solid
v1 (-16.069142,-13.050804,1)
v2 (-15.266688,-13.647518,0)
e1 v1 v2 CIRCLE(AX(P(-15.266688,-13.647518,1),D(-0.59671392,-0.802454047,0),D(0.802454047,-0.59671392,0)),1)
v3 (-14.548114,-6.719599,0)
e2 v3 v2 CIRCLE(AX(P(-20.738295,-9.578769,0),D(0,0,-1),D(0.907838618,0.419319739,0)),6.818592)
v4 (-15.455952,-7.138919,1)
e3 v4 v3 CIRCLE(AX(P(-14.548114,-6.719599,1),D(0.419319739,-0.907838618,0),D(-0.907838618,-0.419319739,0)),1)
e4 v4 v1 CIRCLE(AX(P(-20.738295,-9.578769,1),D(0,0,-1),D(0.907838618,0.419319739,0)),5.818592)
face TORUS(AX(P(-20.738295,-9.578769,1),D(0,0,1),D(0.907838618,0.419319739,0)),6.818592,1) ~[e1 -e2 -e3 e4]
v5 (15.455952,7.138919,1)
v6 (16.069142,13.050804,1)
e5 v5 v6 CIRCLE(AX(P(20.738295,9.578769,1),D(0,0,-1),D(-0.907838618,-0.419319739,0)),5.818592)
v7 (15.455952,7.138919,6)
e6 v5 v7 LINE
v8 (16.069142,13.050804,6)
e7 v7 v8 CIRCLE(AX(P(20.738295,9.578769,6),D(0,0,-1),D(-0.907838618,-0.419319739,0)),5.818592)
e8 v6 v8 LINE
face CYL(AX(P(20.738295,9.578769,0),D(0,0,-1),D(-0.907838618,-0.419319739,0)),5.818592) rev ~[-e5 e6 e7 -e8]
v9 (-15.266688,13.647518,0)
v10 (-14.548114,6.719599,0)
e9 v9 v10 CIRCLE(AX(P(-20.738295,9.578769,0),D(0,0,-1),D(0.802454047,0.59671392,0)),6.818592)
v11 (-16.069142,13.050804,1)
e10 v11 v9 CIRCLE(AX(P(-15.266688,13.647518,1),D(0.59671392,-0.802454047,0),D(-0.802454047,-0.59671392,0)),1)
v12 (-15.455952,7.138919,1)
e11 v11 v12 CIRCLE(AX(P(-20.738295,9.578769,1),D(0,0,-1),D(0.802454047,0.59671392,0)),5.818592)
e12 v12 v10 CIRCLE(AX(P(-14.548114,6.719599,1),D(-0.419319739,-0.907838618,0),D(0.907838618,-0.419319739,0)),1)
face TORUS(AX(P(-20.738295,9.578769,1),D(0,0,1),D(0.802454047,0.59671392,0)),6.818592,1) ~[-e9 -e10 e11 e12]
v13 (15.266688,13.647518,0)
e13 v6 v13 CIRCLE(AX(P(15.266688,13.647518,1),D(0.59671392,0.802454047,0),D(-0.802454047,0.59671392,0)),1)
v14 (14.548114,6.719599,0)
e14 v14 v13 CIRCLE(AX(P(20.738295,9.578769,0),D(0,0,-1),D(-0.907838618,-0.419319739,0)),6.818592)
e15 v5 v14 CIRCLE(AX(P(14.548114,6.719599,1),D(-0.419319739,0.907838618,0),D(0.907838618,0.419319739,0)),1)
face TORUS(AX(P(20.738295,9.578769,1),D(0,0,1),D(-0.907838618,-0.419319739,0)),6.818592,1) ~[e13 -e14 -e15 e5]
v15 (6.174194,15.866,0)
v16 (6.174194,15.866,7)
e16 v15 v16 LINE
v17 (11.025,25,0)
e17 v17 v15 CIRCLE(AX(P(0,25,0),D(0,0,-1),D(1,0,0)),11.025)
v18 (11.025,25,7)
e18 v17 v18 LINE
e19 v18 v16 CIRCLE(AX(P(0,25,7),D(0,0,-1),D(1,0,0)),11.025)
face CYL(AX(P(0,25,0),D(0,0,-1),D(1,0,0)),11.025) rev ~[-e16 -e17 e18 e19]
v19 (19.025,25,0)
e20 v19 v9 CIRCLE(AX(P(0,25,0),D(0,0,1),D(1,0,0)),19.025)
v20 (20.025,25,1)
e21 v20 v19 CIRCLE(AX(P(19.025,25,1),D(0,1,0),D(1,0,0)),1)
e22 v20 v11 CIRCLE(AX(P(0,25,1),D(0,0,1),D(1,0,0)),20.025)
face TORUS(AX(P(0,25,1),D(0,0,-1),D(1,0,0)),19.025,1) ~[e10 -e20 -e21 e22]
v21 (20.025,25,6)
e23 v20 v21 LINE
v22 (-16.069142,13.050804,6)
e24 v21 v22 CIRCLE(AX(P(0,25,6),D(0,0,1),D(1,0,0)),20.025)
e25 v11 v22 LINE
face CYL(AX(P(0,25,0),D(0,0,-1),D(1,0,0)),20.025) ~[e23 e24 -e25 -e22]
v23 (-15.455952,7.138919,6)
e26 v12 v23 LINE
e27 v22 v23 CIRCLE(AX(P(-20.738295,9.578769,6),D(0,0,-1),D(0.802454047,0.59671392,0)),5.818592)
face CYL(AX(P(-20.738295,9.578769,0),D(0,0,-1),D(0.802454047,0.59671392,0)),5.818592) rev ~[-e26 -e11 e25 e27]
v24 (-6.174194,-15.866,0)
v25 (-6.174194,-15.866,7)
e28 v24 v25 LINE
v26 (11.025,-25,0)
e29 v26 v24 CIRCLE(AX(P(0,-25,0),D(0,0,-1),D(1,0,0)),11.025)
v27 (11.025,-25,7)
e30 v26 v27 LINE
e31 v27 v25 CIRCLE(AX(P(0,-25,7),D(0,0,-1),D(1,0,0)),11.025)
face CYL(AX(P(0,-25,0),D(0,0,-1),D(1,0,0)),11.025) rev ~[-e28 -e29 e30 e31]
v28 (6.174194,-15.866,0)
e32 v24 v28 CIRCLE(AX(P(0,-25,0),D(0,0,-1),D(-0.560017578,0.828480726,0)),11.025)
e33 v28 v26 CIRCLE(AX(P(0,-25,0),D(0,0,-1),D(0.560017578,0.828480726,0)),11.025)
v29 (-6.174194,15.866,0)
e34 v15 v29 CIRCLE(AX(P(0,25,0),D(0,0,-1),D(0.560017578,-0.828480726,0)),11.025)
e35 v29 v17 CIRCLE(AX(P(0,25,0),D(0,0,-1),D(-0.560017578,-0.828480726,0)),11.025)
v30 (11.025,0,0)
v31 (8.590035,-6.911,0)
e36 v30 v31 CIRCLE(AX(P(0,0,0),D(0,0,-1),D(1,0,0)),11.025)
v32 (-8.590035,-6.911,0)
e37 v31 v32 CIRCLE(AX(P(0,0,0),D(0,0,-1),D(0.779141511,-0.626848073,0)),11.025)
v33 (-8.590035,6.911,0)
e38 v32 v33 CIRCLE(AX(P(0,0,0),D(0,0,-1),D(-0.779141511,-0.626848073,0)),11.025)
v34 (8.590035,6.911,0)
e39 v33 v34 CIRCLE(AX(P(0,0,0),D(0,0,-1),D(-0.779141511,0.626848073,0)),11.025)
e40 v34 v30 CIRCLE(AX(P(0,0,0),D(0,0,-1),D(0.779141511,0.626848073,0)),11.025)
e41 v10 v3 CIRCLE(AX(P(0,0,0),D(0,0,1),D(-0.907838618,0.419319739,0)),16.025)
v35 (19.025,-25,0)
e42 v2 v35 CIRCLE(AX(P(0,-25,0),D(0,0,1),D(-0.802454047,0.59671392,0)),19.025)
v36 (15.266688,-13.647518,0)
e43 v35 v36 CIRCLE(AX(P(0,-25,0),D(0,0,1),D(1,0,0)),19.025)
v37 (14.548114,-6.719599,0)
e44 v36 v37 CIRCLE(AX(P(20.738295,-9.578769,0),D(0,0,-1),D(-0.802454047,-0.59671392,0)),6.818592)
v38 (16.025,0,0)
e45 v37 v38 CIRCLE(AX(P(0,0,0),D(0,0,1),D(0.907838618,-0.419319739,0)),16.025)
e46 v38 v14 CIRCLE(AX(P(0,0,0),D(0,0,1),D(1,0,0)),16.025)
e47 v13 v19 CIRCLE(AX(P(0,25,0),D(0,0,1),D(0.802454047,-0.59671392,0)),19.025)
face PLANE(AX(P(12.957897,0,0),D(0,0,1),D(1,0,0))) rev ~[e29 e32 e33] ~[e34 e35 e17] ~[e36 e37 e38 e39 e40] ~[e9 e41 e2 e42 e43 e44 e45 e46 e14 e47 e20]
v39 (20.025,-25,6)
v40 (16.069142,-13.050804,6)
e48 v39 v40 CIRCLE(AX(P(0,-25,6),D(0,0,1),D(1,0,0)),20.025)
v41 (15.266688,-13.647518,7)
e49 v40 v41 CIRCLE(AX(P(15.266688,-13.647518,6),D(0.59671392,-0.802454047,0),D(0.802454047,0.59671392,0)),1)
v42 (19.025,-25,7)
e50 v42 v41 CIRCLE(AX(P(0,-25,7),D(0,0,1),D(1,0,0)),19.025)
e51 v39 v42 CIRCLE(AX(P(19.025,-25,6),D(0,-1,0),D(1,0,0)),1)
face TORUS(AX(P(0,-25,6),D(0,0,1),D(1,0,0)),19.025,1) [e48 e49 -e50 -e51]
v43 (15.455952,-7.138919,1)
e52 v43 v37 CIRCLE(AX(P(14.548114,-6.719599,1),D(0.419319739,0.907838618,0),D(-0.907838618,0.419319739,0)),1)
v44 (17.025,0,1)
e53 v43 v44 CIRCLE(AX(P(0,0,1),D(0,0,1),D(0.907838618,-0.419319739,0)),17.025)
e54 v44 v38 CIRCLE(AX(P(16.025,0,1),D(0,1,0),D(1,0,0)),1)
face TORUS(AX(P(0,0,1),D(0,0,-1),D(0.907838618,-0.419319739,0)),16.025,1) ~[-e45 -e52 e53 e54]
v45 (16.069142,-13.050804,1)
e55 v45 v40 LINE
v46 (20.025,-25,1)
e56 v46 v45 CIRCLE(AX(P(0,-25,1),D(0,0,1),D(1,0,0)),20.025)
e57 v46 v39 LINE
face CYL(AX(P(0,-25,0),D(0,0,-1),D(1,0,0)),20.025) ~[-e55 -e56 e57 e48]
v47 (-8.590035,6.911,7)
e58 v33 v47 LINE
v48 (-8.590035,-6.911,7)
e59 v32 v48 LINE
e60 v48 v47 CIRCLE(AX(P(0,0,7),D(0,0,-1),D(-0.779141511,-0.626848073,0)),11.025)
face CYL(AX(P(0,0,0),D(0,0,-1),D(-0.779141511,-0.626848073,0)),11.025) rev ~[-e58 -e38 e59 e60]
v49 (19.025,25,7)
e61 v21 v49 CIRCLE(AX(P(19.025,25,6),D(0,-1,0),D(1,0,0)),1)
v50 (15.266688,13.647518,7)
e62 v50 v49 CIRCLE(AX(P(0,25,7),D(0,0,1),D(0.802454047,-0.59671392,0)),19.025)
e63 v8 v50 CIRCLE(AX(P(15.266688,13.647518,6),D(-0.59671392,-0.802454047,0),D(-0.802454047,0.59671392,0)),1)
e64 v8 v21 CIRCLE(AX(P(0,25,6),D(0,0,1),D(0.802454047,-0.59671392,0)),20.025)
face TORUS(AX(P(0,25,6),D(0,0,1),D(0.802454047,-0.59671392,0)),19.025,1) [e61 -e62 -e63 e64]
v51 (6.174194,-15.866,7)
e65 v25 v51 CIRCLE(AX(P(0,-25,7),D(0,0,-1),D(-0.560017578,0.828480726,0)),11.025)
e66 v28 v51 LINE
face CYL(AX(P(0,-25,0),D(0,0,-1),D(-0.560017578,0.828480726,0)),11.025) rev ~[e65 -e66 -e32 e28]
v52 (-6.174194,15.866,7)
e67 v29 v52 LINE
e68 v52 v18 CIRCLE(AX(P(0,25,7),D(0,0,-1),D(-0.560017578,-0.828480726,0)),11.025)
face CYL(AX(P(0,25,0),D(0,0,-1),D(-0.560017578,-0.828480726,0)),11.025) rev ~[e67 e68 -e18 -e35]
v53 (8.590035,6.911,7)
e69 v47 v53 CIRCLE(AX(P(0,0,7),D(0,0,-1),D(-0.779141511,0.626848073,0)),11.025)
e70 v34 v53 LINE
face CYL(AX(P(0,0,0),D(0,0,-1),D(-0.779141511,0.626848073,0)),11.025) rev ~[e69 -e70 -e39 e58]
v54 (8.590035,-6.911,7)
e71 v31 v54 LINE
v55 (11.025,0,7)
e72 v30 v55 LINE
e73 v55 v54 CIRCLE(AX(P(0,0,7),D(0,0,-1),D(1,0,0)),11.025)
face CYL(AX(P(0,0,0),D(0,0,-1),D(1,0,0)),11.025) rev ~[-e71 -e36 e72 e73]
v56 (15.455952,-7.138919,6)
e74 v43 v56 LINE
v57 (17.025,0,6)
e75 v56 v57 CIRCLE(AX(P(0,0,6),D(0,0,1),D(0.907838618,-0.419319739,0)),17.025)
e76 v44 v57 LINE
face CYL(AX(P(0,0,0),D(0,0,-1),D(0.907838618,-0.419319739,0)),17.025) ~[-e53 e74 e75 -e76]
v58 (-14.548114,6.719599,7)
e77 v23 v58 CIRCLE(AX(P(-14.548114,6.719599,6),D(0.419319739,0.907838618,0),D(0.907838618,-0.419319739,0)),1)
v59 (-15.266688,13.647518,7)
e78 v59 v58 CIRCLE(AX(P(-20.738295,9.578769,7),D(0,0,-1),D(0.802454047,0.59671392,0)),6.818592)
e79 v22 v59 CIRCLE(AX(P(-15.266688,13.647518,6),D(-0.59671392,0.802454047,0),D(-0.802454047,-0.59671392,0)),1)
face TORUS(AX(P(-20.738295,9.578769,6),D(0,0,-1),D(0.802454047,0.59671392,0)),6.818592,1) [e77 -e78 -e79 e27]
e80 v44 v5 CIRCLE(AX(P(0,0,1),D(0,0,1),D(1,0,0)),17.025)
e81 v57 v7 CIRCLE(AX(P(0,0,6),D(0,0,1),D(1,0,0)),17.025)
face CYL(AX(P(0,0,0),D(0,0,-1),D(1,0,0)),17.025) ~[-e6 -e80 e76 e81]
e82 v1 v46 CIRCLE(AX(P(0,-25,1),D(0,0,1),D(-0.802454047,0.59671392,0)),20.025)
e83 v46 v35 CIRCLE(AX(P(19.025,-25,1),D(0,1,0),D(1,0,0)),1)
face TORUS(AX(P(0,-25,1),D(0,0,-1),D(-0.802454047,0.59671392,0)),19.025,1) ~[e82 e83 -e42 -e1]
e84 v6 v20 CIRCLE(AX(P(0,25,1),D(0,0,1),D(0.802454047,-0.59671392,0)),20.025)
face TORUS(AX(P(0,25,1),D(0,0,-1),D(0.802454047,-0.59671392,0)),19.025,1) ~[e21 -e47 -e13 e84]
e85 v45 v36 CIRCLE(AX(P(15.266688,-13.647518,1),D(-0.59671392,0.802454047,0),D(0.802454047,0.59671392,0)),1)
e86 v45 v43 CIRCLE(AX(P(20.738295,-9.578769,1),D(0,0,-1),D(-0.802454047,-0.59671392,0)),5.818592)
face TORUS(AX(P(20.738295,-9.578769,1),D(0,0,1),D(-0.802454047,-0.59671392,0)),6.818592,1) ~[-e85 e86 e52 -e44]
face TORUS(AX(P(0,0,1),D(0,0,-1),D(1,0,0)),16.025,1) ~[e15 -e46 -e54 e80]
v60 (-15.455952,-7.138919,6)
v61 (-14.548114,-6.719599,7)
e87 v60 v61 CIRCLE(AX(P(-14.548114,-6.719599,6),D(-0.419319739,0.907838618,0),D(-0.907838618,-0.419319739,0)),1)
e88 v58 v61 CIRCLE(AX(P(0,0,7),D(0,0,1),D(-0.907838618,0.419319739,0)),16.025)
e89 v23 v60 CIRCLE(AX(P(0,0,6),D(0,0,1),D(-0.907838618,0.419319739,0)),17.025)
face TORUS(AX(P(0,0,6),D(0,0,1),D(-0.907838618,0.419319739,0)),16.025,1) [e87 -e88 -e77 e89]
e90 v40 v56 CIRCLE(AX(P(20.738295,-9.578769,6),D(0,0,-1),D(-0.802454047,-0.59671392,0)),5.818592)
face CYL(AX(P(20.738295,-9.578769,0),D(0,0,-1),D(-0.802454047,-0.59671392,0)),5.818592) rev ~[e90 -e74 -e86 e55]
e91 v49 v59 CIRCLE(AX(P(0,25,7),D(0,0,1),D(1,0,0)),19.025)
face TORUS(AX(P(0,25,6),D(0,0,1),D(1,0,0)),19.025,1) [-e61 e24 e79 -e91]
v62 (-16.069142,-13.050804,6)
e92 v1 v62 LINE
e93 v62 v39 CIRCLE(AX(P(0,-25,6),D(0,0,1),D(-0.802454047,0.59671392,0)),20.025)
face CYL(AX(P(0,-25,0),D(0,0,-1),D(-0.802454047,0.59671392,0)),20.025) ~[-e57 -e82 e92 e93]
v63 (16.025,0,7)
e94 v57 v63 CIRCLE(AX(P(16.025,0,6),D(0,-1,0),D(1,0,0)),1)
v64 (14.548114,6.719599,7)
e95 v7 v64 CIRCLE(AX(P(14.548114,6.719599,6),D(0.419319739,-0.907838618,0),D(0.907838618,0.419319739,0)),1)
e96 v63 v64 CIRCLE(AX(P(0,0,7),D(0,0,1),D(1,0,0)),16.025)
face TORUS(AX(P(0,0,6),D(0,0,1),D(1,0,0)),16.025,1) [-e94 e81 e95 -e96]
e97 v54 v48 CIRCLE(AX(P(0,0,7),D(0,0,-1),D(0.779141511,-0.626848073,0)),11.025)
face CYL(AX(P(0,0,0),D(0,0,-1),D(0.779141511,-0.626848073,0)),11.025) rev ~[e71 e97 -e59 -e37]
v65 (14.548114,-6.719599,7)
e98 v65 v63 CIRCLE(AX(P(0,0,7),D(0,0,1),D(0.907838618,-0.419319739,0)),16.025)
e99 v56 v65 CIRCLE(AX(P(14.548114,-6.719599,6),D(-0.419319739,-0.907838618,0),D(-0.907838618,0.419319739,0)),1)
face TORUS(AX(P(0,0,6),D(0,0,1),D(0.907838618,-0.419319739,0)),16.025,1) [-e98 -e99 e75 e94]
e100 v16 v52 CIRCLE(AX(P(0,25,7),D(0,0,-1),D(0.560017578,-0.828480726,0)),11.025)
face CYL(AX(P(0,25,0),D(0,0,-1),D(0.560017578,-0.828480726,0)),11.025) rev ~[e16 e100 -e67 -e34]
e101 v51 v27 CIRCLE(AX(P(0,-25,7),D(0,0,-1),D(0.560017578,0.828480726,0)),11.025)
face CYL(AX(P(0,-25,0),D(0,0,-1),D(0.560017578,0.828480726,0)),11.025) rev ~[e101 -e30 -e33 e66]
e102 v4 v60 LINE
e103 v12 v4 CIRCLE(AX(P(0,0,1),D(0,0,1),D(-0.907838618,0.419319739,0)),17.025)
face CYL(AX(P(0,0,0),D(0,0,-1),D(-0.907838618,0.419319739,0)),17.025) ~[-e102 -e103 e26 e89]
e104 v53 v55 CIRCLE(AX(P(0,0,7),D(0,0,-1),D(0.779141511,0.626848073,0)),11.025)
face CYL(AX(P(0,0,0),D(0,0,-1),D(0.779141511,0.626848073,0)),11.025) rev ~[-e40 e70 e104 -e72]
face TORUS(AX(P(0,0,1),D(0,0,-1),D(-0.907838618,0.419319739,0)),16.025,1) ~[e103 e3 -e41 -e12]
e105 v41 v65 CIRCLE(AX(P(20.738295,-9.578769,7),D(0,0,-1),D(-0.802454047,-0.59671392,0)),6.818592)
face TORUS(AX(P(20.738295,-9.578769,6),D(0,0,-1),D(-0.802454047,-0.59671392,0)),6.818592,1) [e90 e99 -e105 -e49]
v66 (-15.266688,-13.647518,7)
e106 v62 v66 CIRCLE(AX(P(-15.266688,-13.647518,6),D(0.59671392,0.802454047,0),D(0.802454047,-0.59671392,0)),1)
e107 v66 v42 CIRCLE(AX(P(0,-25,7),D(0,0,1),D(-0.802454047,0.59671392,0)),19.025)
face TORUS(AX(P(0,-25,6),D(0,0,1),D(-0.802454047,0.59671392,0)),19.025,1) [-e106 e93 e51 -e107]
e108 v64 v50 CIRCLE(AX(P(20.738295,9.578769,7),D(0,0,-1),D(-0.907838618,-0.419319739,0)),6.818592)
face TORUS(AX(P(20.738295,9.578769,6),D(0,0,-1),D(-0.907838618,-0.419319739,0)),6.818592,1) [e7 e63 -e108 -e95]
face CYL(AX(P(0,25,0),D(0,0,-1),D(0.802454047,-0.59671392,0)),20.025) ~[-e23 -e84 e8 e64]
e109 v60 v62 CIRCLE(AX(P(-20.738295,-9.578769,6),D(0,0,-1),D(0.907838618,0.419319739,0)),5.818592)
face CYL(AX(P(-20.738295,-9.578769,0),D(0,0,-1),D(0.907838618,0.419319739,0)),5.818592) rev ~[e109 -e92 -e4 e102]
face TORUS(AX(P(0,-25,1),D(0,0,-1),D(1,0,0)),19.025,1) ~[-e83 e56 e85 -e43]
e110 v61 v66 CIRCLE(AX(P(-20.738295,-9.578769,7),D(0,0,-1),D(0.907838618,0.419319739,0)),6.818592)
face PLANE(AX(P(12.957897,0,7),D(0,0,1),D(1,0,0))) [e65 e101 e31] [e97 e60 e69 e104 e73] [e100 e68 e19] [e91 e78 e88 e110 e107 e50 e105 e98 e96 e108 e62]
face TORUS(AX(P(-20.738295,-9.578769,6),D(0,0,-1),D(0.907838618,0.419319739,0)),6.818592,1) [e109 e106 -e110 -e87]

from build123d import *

# Parameters (mm, degrees)
F1_DEPTH = 7
F2_R     = 1


# Not quite as in the source:
# - a feature names something its author has since deleted; it is built from what else it names


with BuildPart() as f1:
    # F0 (on Top) → F1 (new body)
    with BuildSketch(Plane.XY):
        with BuildLine():
            ThreePointArc((8.5900351571, 6.911), (10.3984557172, 3.6637062787), (11.025, 0))
            ThreePointArc((11.025, 0), (10.3984557172, -3.6637062787), (8.5900351571, -6.911))
            ThreePointArc((8.5900351571, -6.911), (11.2087291798, -8.4058740762), (13.5732787491, -10.277))
            ThreePointArc((13.5732787491, -10.277), (14.5991765239, -8.7586911022), (15.455952476, -7.1389185498))
            ThreePointArc((15.455952476, -7.1389185498), (16.628111978, -3.6546568989), (17.025, 0))
            ThreePointArc((17.025, 0), (16.628111978, 3.6546568989), (15.455952476, 7.1389185498))
            ThreePointArc((15.455952476, 7.1389185498), (14.5991765239, 8.7586911022), (13.5732787491, 10.277))
            ThreePointArc((13.5732787491, 10.277), (11.2087291798, 8.4058740762), (8.5900351571, 6.911))
        make_face()
        with BuildLine():
            ThreePointArc((-8.5900351571, -6.911), (-11.025, 0), (-8.5900351571, 6.911))
            ThreePointArc((-8.5900351571, 6.911), (-11.2087291798, 8.4058740762), (-13.5732787491, 10.277))
            ThreePointArc((-13.5732787491, 10.277), (-14.5991765239, 8.7586911022), (-15.455952476, 7.1389185498))
            ThreePointArc((-15.455952476, 7.1389185498), (-17.025, 0), (-15.455952476, -7.1389185498))
            ThreePointArc((-15.455952476, -7.1389185498), (-14.5991765239, -8.7586911022), (-13.5732787491, -10.277))
            ThreePointArc((-13.5732787491, -10.277), (-11.2087291798, -8.4058740762), (-8.5900351571, -6.911))
        make_face()
        with BuildLine():
            ThreePointArc((6.1741937935, 15.866), (10.2615738659, 13.584944858), (13.5732787491, 10.277))
            ThreePointArc((13.5732787491, 10.277), (14.88595909, 11.6056412259), (16.0691422874, 13.0508037447))
            ThreePointArc((16.0691422874, 13.0508037447), (19.0103287623, 18.7065092876), (20.025, 25))
            ThreePointArc((20.025, 25), (-6.2934907124, 44.0103287623), (-16.0691422874, 13.0508037447))
            ThreePointArc((-16.0691422874, 13.0508037447), (-14.88595909, 11.6056412259), (-13.5732787491, 10.277))
            ThreePointArc((-13.5732787491, 10.277), (-10.2615738659, 13.584944858), (-6.1741937935, 15.866))
            ThreePointArc((-6.1741937935, 15.866), (-5.1710800819, 34.737071212), (11.025, 25))
            ThreePointArc((11.025, 25), (9.737071212, 19.8289199181), (6.1741937935, 15.866))
        make_face()
        with BuildLine():
            ThreePointArc((16.0691422874, 13.0508037447), (14.88595909, 11.6056412259), (13.5732787491, 10.277))
            ThreePointArc((13.5732787491, 10.277), (14.5991765239, 8.7586911022), (15.455952476, 7.1389185498))
            ThreePointArc((15.455952476, 7.1389185498), (14.9507513772, 10.1790618755), (16.0691422874, 13.0508037447))
        make_face()
        with BuildLine():
            ThreePointArc((16.0691422874, -13.0508037447), (14.88595909, -11.6056412259), (13.5732787491, -10.277))
            ThreePointArc((13.5732787491, -10.277), (10.2615738659, -13.584944858), (6.1741937935, -15.866))
            ThreePointArc((6.1741937935, -15.866), (9.737071212, -19.8289199181), (11.025, -25))
            ThreePointArc((11.025, -25), (-5.1710800819, -34.737071212), (-6.1741937935, -15.866))
            ThreePointArc((-6.1741937935, -15.866), (-10.2615738659, -13.584944858), (-13.5732787491, -10.277))
            ThreePointArc((-13.5732787491, -10.277), (-14.88595909, -11.6056412259), (-16.0691422874, -13.0508037447))
            ThreePointArc((-16.0691422874, -13.0508037447), (-6.2934907124, -44.0103287623), (20.025, -25))
            ThreePointArc((20.025, -25), (19.0103287623, -18.7065092876), (16.0691422874, -13.0508037447))
        make_face()
        with BuildLine():
            ThreePointArc((15.455952476, -7.1389185498), (14.5991765239, -8.7586911022), (13.5732787491, -10.277))
            ThreePointArc((13.5732787491, -10.277), (14.88595909, -11.6056412259), (16.0691422874, -13.0508037447))
            ThreePointArc((16.0691422874, -13.0508037447), (14.9507513772, -10.1790618755), (15.455952476, -7.1389185498))
        make_face()
        with BuildLine():
            ThreePointArc((-15.455952476, 7.1389185498), (-14.5991765239, 8.7586911022), (-13.5732787491, 10.277))
            ThreePointArc((-13.5732787491, 10.277), (-14.88595909, 11.6056412259), (-16.0691422874, 13.0508037447))
            ThreePointArc((-16.0691422874, 13.0508037447), (-14.9507513772, 10.1790618755), (-15.455952476, 7.1389185498))
        make_face()
        with BuildLine():
            ThreePointArc((-16.0691422874, -13.0508037447), (-14.88595909, -11.6056412259), (-13.5732787491, -10.277))
            ThreePointArc((-13.5732787491, -10.277), (-14.5991765239, -8.7586911022), (-15.455952476, -7.1389185498))
            ThreePointArc((-15.455952476, -7.1389185498), (-14.9507513772, -10.1790618755), (-16.0691422874, -13.0508037447))
        make_face()
        with BuildLine():
            ThreePointArc((-8.5900351571, 6.911), (0, 11.025), (8.5900351571, 6.911))
            ThreePointArc((8.5900351571, 6.911), (11.2087291798, 8.4058740762), (13.5732787491, 10.277))
            ThreePointArc((13.5732787491, 10.277), (10.2615738659, 13.584944858), (6.1741937935, 15.866))
            ThreePointArc((6.1741937935, 15.866), (0, 13.975), (-6.1741937935, 15.866))
            ThreePointArc((-6.1741937935, 15.866), (-10.2615738659, 13.584944858), (-13.5732787491, 10.277))
            ThreePointArc((-13.5732787491, 10.277), (-11.2087291798, 8.4058740762), (-8.5900351571, 6.911))
        make_face()
        with BuildLine():
            ThreePointArc((13.5732787491, -10.277), (11.2087291798, -8.4058740762), (8.5900351571, -6.911))
            ThreePointArc((8.5900351571, -6.911), (0, -11.025), (-8.5900351571, -6.911))
            ThreePointArc((-8.5900351571, -6.911), (-11.2087291798, -8.4058740762), (-13.5732787491, -10.277))
            ThreePointArc((-13.5732787491, -10.277), (-10.2615738659, -13.584944858), (-6.1741937935, -15.866))
            ThreePointArc((-6.1741937935, -15.866), (0, -13.975), (6.1741937935, -15.866))
            ThreePointArc((6.1741937935, -15.866), (10.2615738659, -13.584944858), (13.5732787491, -10.277))
        make_face()
    extrude(amount=F1_DEPTH)

    # F2
    f2_edges = [f1.edges().sort_by_distance(p)[0] for p in [
        (16.069142, 13.050804, 3.5),
        (-16.069142, 13.050804, 3.5),
        (0, 45.025, 0),
        (0, 45.025, 7),
        (-15.455952, 7.138919, 3.5),
        (-14.950751, 10.179062, 0),
        (-14.950751, 10.179062, 7),
        (-15.455952, -7.138919, 3.5),
        (-16.069142, -13.050804, 3.5),
        (-14.950751, -10.179062, 0),
        (-14.950751, -10.179062, 7),
        (16.069142, -13.050804, 3.5),
        (0, -45.025, 0),
        (0, -45.025, 7),
    ]]
    fillet(f2_edges, radius=F2_R)


solid = f1.part
